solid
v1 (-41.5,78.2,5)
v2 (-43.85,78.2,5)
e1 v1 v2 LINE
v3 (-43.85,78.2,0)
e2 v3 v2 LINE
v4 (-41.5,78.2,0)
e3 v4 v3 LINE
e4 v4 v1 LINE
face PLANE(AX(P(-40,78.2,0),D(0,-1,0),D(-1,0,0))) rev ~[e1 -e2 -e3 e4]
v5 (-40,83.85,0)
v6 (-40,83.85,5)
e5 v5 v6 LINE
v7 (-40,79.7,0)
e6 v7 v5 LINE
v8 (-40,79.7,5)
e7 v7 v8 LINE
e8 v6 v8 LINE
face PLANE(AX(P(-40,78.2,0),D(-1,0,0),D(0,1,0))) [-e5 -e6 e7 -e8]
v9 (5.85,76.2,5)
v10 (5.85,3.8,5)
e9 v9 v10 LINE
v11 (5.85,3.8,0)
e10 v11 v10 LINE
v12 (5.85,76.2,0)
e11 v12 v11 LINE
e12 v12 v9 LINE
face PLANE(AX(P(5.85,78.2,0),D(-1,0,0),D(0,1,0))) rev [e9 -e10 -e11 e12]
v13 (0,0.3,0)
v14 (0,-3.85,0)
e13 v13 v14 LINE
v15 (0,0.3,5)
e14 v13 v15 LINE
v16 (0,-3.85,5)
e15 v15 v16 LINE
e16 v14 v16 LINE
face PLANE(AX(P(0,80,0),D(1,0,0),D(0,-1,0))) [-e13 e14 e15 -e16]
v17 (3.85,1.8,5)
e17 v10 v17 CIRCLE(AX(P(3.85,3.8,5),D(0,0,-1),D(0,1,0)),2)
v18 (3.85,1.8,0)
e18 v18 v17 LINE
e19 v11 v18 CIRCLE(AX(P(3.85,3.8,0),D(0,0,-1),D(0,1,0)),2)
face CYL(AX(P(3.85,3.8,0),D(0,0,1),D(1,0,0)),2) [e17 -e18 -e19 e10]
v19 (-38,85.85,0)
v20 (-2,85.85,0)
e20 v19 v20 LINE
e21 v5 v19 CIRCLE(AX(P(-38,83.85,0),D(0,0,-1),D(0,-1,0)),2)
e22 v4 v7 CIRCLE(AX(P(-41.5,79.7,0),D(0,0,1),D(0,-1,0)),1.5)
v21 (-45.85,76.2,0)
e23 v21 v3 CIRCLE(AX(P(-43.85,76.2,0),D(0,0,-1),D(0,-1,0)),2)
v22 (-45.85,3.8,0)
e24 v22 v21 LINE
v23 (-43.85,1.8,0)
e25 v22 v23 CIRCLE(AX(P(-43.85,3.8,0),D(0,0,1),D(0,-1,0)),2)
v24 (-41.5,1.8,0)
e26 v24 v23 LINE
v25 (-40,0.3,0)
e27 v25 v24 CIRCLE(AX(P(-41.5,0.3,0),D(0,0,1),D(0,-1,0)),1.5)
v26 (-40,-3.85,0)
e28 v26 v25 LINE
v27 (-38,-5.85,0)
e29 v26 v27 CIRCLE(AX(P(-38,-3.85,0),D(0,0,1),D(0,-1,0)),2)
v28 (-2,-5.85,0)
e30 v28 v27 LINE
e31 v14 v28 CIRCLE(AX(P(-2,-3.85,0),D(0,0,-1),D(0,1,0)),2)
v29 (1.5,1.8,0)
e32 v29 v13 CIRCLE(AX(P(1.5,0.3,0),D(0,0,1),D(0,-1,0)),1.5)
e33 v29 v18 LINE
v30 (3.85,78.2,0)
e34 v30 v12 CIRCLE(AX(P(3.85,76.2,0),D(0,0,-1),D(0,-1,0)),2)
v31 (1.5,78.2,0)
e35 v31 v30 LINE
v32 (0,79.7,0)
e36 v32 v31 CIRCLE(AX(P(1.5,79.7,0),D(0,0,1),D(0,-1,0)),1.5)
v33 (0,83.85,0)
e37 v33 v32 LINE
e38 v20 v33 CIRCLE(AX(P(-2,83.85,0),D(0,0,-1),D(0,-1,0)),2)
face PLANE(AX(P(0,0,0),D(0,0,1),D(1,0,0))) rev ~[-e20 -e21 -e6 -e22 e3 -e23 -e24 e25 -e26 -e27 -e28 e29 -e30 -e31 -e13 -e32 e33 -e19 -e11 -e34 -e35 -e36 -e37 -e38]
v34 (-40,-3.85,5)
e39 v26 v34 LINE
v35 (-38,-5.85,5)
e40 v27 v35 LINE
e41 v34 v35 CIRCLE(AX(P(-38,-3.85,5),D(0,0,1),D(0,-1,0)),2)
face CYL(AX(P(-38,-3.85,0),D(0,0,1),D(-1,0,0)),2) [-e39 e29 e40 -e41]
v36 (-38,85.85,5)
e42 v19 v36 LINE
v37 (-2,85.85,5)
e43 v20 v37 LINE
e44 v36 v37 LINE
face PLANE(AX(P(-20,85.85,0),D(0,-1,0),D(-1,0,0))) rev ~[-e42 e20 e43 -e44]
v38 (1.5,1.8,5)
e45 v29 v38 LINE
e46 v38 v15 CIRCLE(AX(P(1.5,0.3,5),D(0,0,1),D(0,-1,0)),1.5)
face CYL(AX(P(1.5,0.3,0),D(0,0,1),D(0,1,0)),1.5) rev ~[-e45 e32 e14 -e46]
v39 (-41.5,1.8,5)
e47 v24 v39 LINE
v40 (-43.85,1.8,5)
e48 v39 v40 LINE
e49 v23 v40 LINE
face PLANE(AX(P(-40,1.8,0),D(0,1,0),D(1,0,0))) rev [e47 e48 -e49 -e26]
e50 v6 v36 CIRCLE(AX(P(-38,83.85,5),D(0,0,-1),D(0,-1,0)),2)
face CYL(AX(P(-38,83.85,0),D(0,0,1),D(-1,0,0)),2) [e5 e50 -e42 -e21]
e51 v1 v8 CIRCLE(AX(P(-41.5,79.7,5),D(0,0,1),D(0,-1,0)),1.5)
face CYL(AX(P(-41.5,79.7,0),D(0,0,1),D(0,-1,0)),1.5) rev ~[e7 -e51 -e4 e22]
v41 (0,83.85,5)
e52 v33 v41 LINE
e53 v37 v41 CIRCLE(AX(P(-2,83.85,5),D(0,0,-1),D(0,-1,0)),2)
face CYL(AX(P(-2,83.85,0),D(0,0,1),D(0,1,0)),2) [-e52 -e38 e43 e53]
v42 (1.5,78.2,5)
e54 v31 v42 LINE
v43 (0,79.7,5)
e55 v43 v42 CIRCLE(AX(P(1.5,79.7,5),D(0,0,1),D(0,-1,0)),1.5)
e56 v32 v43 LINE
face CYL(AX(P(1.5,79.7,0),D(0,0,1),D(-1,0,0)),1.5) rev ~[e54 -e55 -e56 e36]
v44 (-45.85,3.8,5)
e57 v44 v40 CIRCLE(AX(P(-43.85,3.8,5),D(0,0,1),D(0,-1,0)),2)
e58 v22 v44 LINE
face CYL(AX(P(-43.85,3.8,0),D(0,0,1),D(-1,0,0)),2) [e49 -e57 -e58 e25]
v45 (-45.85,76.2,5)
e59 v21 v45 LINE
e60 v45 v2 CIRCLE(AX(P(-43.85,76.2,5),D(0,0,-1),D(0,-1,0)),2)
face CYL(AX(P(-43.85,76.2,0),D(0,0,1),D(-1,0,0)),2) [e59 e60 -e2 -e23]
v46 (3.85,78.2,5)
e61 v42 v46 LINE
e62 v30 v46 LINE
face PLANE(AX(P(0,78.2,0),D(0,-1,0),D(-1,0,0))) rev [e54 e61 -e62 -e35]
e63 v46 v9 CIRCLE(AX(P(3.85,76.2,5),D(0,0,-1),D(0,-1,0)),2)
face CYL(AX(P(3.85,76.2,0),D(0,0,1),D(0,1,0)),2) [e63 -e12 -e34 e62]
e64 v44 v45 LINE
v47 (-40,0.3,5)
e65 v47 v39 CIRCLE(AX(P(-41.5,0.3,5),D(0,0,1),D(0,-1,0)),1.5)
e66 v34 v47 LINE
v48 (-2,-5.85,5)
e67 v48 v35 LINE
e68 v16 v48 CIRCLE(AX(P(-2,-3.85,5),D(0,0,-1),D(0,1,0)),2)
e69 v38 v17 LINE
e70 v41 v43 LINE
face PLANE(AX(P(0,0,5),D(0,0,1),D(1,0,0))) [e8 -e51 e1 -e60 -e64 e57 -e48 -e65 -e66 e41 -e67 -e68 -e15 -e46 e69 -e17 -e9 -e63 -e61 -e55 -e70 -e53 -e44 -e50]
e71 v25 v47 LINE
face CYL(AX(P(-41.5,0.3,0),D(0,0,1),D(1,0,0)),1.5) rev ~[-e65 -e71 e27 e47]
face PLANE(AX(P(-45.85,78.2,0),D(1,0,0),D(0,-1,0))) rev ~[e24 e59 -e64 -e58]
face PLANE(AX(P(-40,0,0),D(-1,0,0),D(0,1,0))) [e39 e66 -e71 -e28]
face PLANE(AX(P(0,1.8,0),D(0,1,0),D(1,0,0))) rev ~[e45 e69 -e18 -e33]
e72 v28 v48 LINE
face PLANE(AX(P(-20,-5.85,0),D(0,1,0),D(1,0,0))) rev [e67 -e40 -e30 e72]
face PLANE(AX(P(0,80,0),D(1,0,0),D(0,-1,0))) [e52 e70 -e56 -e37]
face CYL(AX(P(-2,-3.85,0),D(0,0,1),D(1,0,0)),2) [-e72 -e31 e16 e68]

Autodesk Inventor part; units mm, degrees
ref_plane "YZ Plane" through (0, 0, 0) normal (1, 0, 0) x (0, 1, 0)
ref_plane "XZ Plane" through (0, 0, 0) normal (0, 1, 0) x (-1, 0, 0)
ref_plane "XY Plane" through (0, 0, 0) normal (0, 0, 1) x (1, 0, 0)
sketch "Skizze3" plane through (0, 0, 0) normal (0, 0, 1) x (1, 0, 0)
  line L0 (0, 0) -> (-40, 0)
  line L1 (-40, 0) -> (-40, 80)
  line L2 (-40, 80) -> (0, 80)
  line L3 (0, 80) -> (0, 0)
  line L4 (-40, 78.2) -> (-45.85, 78.2)
  line L5 (-45.85, 78.2) -> (-45.85, 40)
  line L6 (-45.85, 40) -> (-40, 40)
  line L7 (-40, 40) -> (-40, 78.2)
  line L8 (-40, 80) -> (-20, 80)
  line L9 (-20, 80) -> (-20, 85.85)
  line L10 (-20, 85.85) -> (-40, 85.85)
  line L11 (-40, 85.85) -> (-40, 80)
  point P0 (-40, 40)
  point P1 (-20, 80)
  dimension "d4" = 80
  dimension "d5" = 40
  dimension "d6" = 5.85
  dimension "d7" = 1.8
  dimension "d8" = 5.85
extrude "Extrusion3" add sketch "Skizze3" along normal blind 5 contours L0 L1 L2 L3
extrude "Extrusion4" add sketch "Skizze3" along normal blind 5 contours L6 L5 L4 L1 | L2 L11 L10 L9
fillet "Rundung1" radius 2 2 edges at (-45.85, 78.2, 2.5) (-40, 85.85, 2.5)
mirror "Spiegeln1" about plane through (-45.85, 40, 0) normal (0, -1, 0) of "Extrusion4", "Rundung1"
mirror "Spiegeln2" about plane through (-20, 80, 0) normal (1, 0, 0) of "Extrusion4", "Rundung1", "Spiegeln1"
fillet "Rundung2" radius 1.5 4 edges at (0, 78.2, 2.5) (-40, 78.2, 2.5) (-40, 1.8, 2.5) (0, 1.8, 2.5)
equation "\"d6\" = d8"
properties part number "BT702_trajan20_21" material "Acryl"
